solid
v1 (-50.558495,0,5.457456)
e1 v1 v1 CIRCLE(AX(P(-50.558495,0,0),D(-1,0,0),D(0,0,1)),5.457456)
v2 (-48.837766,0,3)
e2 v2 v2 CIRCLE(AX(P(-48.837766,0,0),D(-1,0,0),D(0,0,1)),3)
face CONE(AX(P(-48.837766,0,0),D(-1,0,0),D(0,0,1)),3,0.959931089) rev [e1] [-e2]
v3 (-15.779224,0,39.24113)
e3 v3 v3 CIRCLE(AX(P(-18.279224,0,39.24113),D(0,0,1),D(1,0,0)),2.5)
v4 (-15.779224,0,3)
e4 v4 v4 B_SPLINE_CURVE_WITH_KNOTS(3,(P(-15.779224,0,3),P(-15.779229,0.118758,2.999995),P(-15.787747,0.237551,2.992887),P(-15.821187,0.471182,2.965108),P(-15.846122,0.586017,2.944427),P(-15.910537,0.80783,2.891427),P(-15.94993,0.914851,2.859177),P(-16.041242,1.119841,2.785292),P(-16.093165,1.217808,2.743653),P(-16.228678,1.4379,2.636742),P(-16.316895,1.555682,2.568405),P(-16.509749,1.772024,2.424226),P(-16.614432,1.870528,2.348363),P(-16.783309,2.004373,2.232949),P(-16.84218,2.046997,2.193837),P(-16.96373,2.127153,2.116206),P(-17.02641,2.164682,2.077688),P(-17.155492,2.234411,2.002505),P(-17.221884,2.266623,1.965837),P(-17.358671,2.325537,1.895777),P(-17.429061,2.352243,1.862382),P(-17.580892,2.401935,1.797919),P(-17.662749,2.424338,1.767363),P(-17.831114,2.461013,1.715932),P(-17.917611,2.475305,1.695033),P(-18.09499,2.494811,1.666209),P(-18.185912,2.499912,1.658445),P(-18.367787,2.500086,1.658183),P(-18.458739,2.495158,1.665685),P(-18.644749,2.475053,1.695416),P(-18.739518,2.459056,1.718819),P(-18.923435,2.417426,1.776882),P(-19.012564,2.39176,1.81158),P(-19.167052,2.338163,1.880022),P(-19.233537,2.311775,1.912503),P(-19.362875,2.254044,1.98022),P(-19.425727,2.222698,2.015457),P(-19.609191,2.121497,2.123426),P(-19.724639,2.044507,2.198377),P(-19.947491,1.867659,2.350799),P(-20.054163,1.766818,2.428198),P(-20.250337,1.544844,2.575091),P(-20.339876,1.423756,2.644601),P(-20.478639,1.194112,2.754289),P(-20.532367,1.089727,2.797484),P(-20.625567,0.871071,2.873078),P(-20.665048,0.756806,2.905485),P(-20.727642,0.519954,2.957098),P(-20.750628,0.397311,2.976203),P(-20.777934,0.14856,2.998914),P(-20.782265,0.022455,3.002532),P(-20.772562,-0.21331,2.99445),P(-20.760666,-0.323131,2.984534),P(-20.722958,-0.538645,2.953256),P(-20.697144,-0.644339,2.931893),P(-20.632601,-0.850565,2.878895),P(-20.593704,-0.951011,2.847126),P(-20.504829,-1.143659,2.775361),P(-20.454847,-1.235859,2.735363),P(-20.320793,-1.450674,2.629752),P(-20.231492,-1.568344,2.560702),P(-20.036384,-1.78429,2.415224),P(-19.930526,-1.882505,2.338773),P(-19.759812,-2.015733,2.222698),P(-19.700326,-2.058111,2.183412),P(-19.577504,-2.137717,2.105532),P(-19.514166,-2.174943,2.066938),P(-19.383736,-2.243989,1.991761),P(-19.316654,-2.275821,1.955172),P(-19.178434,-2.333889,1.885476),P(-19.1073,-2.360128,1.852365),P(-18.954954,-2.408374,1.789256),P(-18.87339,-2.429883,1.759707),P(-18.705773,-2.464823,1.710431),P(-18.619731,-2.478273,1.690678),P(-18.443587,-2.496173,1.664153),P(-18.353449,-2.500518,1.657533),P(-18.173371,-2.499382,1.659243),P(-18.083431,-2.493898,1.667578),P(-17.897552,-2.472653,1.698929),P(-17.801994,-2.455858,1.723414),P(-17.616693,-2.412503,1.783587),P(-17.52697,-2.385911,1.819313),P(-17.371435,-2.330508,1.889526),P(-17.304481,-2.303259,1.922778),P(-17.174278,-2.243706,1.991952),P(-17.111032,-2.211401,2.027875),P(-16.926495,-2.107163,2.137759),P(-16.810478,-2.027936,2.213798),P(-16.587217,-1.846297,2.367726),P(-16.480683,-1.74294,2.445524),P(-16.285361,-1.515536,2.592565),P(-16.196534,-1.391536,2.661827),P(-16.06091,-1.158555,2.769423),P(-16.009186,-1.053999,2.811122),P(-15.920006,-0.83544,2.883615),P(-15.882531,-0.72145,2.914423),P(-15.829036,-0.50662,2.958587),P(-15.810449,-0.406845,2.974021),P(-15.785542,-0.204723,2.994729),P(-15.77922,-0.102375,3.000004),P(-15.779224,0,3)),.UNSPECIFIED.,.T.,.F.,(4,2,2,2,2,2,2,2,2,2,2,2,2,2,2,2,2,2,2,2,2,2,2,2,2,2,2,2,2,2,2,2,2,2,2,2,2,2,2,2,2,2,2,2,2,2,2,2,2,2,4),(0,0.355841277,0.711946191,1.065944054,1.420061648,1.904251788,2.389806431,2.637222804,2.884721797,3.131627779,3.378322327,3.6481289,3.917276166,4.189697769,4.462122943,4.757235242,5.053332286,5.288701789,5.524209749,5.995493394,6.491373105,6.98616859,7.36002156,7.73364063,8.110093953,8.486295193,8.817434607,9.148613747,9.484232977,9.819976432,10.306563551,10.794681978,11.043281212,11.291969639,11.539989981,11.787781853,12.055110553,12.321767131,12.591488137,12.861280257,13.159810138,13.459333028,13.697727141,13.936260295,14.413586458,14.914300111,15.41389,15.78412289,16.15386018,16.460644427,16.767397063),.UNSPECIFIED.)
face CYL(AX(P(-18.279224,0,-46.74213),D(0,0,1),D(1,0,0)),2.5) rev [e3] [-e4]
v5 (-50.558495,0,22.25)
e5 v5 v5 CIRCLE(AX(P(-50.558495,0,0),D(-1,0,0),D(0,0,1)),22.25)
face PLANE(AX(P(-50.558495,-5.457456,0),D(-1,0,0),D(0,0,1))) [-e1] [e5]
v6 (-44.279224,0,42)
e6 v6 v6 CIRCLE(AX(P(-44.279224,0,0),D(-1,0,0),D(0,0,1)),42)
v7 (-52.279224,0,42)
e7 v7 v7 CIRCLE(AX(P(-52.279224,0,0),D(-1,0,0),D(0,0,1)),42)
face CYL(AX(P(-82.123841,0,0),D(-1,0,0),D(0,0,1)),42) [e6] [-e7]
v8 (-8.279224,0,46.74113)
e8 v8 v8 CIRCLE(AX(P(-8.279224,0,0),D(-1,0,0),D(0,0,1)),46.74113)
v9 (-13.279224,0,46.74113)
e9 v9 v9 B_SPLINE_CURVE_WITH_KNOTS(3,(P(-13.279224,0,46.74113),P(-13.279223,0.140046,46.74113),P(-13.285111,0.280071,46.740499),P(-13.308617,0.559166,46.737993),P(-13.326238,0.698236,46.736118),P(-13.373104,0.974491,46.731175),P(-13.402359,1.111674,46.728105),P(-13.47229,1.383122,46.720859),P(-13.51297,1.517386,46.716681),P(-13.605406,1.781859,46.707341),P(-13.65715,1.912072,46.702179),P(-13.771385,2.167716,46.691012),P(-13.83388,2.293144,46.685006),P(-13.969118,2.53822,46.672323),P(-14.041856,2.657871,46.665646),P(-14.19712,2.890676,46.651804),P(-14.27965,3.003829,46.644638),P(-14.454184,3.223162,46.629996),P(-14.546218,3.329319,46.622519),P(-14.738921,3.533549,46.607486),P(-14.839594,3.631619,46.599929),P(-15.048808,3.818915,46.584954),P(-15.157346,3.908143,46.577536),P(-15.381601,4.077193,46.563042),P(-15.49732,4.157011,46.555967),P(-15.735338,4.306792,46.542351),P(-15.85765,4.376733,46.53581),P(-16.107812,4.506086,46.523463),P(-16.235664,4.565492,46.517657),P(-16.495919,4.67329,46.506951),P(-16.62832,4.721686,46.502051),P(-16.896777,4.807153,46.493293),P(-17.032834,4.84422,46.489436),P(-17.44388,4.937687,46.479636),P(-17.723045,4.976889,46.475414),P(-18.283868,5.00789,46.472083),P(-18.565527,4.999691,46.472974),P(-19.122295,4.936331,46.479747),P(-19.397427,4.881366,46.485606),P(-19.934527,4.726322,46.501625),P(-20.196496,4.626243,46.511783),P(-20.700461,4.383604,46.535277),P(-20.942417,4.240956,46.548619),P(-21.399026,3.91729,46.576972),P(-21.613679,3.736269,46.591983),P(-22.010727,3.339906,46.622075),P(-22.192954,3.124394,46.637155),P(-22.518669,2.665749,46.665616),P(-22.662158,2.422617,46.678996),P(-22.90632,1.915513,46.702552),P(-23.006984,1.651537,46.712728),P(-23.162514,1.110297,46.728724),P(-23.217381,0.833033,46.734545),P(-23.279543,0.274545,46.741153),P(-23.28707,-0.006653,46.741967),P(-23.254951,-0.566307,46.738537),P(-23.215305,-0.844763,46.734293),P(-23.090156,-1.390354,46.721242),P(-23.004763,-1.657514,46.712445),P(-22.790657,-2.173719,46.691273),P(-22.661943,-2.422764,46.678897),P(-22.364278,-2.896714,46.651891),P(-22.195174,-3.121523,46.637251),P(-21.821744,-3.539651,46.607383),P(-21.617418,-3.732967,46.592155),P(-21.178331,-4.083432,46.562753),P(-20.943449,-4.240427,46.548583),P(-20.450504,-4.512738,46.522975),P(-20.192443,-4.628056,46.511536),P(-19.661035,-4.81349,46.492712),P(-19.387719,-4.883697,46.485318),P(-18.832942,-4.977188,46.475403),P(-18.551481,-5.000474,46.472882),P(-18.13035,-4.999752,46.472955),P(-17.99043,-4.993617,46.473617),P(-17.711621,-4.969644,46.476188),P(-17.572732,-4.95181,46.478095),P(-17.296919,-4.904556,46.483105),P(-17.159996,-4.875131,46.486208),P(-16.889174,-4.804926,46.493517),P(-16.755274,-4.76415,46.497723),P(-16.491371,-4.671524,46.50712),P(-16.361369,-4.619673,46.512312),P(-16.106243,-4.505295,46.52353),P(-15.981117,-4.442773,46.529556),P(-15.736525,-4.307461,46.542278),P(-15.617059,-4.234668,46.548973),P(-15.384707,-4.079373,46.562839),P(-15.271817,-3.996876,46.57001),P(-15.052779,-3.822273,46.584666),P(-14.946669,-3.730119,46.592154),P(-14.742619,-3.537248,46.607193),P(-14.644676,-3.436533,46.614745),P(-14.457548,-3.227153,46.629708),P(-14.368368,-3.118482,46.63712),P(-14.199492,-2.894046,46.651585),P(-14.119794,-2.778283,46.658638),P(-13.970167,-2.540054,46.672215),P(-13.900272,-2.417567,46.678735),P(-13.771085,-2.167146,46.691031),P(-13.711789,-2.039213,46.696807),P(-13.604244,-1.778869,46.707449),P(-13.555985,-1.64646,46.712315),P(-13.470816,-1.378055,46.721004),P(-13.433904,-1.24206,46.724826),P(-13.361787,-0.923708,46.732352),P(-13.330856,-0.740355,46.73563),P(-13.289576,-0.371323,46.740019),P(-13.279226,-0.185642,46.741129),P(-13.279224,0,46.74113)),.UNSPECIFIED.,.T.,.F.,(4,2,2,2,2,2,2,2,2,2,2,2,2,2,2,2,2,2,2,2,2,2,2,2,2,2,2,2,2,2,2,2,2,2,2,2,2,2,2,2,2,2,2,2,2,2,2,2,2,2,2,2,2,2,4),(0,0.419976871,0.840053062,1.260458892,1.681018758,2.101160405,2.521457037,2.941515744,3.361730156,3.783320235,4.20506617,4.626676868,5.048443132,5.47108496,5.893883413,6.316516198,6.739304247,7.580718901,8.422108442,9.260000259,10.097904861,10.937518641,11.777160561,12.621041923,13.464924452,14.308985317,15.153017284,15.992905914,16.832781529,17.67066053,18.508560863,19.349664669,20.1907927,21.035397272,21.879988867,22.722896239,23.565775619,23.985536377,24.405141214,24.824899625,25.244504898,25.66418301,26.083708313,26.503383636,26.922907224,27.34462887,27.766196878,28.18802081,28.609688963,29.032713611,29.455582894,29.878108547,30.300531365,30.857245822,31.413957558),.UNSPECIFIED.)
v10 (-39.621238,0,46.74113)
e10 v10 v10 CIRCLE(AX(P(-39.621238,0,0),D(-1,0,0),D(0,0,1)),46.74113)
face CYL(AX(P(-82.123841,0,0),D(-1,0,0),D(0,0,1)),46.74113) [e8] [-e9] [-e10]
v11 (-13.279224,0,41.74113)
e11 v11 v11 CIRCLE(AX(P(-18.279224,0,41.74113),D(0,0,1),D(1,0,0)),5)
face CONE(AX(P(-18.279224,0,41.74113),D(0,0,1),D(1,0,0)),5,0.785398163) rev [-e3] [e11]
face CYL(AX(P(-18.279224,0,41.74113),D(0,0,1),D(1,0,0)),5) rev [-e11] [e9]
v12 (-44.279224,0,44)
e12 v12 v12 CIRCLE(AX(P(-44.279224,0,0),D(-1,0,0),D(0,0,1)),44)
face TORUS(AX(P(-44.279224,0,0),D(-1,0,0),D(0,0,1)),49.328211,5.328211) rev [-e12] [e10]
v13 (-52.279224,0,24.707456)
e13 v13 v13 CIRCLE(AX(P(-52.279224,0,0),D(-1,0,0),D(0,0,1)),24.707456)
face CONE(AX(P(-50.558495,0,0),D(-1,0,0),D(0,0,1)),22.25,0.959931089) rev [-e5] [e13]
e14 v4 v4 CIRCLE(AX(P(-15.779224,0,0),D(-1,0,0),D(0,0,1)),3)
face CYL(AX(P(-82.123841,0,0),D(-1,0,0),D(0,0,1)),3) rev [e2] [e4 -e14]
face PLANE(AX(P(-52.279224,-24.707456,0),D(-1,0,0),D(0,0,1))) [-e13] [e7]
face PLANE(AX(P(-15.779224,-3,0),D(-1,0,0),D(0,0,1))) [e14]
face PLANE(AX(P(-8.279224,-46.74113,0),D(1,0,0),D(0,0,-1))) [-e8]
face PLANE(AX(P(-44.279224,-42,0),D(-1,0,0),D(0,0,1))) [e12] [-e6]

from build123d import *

# Parameters (mm, degrees)
CUT_EXTRUDE8_REACH      = 118.862
CUT_EXTRUDE8_END_RADIUS = 3
SKETCH2_R               = 2.5
SKETCH9_R               = 5
CUT_EXTRUDE9_DEPTH      = 5
CHAMFER1_SIZE           = 2.5


with BuildPart() as part:
    # Sketch1 → Revolve1 (revolve)
    with BuildSketch(Plane.XY, mode=Mode.PRIVATE) as revolve1_sk:
        with BuildLine():
            Line((-28.837765837, -3), (-15.779224455, -3))
            Line((-15.779224455, -3), (-15.779224455, 0))
            Line((-15.779224455, 0), (-8.279224455, 0))
            Line((-8.279224455, 0), (-8.279224455, -46.741129743))
            Line((-8.279224455, -46.741129743), (-39.621237636, -46.741129743))
            ThreePointArc((-39.621237636, -46.741129743), (-41.576881329, -44.736133736), (-44.279224455, -44))
            Line((-44.279224455, -44), (-44.279224455, -42))
            Line((-44.279224455, -42), (-52.279224455, -42))
            Line((-52.279224455, -42), (-52.279224455, -30))
            Line((-52.279224455, -30), (-52.279224455, -24.707456133))
            Line((-52.279224455, -24.707456133), (-50.558495146, -22.25))
            Line((-50.558495146, -22.25), (-50.558495146, -5.457456133))
            Line((-50.558495146, -5.457456133), (-48.837765837, -3))
            Line((-48.837765837, -3), (-28.837765837, -3))
        make_face()
    revolve(revolve1_sk.sketch.rotate(Axis((-82.123840877, 0, 0), (1, 0, 0)), 270), axis=Axis((-82.123840877, 0, 0), (1, 0, 0)))

    # Cut-Extrude8: up to this cylinder (the profile starts outside it)
    cut_extrude8_end = Plane(origin=(-18.279224, 0, 0), z_dir=(-1, 0, 0)) * Cylinder(CUT_EXTRUDE8_END_RADIUS, 244.724, mode=Mode.PRIVATE)
    # Sketch2 → Cut-Extrude8 (cut, up to the surface)
    with BuildSketch(Plane.XY.offset(46.741129743), mode=Mode.PRIVATE) as cut_extrude8_sk1:
        with Locations((-18.279224455, 0)):
            Circle(SKETCH2_R)
    cut_extrude8_tool1 = extrude(cut_extrude8_sk1.sketch, amount=-CUT_EXTRUDE8_REACH, mode=Mode.PRIVATE) - cut_extrude8_end
    add(cut_extrude8_tool1.solids().sort_by_distance((-18.279224, 0, 46.74113))[0], mode=Mode.SUBTRACT)

    # Sketch9 → Cut-Extrude9 (cut)
    with BuildSketch(Plane.XY.offset(46.741129743)):
        with Locations((-18.279224455, 0)):
            Circle(SKETCH9_R)
    extrude(amount=-CUT_EXTRUDE9_DEPTH, mode=Mode.SUBTRACT)

    # Chamfer1
    chamfer1_edges = [part.edges().sort_by_distance(p)[0] for p in [
        (-20.779224455, 0, 41.741129743),
    ]]
    chamfer(chamfer1_edges, length=CHAMFER1_SIZE - 0.0001)  # a hair under: the kernel refuses the full size


solid = part.part
